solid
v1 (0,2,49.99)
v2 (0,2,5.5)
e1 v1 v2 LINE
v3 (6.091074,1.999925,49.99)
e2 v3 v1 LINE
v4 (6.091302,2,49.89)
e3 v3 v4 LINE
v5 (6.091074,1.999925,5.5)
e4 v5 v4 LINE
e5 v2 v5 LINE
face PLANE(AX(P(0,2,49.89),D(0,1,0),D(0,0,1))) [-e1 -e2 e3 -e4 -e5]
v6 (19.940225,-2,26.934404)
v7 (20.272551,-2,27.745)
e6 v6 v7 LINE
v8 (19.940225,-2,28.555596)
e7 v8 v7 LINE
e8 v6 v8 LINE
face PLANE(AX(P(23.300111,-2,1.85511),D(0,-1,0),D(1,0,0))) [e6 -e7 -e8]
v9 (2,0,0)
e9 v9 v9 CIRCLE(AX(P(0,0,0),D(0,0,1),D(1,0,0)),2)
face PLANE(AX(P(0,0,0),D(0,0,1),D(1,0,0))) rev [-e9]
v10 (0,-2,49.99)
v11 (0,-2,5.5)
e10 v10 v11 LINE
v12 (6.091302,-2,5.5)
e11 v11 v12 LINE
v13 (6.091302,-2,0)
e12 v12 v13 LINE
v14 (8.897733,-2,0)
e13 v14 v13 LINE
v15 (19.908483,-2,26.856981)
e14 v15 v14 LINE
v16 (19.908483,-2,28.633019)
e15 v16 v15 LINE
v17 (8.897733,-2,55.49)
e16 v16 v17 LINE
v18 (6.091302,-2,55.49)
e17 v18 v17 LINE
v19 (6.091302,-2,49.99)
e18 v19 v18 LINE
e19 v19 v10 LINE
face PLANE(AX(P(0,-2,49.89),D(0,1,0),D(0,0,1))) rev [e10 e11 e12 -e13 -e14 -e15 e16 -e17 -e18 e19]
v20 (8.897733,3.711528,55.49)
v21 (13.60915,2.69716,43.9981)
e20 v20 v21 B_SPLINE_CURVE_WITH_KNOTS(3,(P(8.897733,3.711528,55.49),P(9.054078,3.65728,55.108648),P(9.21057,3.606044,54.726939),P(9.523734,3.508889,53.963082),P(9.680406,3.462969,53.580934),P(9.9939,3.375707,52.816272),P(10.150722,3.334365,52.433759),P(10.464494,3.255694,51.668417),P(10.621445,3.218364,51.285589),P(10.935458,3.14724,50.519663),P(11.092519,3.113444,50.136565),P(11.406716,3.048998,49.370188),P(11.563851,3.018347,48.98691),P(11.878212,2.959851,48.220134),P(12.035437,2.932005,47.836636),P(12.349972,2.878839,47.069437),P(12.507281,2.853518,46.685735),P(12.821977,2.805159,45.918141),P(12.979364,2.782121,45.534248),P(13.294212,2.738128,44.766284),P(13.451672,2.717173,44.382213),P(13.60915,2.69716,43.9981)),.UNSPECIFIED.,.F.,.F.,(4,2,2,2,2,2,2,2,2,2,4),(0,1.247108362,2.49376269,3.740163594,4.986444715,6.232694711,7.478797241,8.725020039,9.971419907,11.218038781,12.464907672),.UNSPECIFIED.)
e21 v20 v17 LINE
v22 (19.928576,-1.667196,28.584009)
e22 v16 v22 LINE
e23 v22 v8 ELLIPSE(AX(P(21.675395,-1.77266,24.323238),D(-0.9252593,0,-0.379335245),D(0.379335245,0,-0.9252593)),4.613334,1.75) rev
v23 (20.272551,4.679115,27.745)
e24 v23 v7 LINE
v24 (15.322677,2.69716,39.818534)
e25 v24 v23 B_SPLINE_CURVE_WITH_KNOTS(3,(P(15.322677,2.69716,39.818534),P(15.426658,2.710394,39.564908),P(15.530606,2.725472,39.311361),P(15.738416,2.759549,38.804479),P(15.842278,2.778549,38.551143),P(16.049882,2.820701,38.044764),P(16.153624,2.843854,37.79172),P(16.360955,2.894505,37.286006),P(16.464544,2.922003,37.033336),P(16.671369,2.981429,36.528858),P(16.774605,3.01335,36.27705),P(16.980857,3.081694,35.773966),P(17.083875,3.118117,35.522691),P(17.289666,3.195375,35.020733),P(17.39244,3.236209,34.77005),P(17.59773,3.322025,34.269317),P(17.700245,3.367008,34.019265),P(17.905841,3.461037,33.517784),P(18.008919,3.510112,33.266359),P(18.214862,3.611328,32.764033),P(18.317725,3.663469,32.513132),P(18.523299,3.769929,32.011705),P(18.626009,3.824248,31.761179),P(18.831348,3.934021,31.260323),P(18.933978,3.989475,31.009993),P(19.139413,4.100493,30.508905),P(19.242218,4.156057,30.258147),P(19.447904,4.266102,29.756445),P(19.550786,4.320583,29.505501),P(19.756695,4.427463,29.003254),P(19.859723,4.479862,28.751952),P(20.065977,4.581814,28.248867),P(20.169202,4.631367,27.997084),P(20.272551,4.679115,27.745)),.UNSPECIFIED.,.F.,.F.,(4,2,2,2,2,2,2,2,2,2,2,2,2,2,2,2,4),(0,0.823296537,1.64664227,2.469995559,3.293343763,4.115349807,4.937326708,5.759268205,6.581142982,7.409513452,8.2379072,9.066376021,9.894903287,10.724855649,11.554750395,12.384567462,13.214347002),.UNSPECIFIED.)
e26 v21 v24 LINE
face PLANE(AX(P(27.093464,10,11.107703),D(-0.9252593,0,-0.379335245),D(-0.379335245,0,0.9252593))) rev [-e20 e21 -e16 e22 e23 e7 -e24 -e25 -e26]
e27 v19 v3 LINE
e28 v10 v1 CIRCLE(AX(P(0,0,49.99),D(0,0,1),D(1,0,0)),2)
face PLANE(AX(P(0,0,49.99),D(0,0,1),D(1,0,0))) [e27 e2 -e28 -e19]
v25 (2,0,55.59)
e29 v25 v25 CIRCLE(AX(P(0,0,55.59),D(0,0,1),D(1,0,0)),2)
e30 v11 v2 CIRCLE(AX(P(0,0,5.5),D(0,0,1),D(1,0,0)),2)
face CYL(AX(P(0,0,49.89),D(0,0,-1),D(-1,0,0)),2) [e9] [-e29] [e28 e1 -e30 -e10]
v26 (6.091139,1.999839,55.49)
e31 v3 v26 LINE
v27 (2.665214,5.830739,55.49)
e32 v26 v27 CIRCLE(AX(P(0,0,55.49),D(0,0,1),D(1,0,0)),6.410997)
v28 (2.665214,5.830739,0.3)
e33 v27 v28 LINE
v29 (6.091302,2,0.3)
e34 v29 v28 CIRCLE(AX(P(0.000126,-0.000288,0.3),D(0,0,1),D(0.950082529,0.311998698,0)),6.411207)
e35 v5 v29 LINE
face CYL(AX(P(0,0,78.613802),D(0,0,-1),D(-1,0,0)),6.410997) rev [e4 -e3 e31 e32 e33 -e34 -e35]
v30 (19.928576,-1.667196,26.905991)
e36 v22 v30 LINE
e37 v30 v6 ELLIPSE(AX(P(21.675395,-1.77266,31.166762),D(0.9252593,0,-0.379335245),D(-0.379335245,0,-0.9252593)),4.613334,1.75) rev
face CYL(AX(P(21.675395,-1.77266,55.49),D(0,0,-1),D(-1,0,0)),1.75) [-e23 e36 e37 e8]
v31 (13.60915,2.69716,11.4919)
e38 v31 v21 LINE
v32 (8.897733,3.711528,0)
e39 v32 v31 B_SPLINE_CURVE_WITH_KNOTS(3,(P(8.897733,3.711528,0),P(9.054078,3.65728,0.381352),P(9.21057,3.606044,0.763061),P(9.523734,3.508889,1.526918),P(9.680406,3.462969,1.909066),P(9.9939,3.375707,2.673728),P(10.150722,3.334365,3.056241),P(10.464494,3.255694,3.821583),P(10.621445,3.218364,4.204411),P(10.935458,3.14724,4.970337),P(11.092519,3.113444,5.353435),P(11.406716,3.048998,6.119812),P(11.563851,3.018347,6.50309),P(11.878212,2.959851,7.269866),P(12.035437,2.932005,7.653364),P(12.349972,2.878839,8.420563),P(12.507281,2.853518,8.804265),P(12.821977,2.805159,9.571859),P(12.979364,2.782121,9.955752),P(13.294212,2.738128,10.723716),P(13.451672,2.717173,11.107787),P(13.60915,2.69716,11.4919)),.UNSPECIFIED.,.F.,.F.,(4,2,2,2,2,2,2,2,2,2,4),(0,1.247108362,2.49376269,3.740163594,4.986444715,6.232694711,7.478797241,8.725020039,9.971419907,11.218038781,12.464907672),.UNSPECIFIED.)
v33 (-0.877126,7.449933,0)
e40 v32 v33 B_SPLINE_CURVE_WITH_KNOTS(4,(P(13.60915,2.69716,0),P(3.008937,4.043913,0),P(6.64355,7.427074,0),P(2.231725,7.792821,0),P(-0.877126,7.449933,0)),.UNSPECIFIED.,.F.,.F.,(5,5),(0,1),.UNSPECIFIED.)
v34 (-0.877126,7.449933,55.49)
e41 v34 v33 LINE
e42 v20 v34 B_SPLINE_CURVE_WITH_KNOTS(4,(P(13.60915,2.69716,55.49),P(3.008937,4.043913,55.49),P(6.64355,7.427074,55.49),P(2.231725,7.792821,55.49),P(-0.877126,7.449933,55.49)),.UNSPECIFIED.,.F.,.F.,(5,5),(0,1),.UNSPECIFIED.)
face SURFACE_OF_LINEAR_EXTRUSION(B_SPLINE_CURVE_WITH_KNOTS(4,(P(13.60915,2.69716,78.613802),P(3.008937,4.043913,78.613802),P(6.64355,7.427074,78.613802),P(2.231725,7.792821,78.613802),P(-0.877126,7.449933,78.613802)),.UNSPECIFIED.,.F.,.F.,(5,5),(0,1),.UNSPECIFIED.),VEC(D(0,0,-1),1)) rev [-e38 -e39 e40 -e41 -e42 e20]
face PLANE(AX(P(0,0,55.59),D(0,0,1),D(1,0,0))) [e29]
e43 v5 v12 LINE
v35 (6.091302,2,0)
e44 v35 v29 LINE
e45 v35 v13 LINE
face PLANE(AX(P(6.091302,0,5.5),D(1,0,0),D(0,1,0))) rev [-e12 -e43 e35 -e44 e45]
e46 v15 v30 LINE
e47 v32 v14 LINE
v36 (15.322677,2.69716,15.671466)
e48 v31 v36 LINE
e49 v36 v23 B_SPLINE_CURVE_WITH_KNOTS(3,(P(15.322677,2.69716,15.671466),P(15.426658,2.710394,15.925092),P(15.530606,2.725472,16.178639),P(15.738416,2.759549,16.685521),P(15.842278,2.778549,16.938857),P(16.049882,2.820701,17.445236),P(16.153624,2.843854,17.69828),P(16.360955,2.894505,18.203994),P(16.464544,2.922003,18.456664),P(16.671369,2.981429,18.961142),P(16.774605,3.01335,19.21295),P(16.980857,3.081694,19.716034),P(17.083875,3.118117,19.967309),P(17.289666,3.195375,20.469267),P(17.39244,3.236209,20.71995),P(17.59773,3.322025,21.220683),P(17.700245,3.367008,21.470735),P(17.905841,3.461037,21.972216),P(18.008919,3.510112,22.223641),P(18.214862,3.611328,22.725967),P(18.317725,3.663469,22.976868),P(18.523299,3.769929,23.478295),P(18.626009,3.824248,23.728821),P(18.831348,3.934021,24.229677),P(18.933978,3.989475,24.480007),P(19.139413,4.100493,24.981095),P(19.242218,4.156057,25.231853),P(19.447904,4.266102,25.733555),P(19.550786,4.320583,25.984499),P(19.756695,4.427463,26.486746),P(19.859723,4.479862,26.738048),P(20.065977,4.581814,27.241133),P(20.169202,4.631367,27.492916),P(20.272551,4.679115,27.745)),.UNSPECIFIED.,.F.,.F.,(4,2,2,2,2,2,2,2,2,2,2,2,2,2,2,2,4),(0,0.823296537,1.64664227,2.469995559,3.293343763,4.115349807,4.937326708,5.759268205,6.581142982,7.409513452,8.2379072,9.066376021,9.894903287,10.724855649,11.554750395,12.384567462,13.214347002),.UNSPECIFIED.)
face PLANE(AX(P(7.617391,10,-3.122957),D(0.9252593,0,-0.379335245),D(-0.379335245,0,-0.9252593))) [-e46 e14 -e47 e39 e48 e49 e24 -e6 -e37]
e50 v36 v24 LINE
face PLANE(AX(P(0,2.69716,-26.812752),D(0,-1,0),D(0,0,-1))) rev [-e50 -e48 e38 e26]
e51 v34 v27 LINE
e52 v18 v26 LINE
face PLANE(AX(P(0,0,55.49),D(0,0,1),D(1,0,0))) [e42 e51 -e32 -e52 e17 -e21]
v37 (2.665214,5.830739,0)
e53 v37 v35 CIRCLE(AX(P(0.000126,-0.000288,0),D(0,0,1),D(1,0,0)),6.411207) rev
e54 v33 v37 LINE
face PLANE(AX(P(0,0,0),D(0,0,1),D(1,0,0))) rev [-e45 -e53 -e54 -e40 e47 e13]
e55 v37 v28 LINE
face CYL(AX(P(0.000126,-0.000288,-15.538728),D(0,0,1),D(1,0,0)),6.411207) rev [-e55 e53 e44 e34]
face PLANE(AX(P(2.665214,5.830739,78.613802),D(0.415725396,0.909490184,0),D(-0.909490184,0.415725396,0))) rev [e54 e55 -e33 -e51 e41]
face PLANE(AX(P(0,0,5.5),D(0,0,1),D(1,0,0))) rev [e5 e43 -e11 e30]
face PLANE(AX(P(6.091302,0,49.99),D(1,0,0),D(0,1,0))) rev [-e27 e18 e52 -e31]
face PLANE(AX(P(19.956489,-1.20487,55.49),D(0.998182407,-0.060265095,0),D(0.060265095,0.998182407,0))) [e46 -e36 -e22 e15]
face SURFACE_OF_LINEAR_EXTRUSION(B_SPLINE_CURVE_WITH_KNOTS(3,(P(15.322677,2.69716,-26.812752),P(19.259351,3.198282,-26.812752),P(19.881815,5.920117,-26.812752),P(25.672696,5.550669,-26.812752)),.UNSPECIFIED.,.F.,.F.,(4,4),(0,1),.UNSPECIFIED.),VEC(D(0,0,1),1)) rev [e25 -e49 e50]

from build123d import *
from build123d.topology import SkipClean

# Parameters (mm, degrees)
BOSS_EXTRUDE1_DEPTH              = 55.49
BOSS_EXTRUDE5_DEPTH              = 4
BOSS_EXTRUDE6_START              = 51.49
BOSS_EXTRUDE6_DEPTH              = 4
BOSS_EXTRUDE7_START              = 5.6
BOSS_EXTRUDE7_DEPTH              = 44.29
SKETCH1_11_R                     = 2
BOSS_EXTRUDE8_DEPTH              = 55.59
BOSS_EXTRUDE9_DEPTH              = 55.49
BOSS_EXTRUDE10_REACH             = 60.551
SKETCH3_W                        = 44.29
SKETCH3_H                        = 4
BOSS_EXTRUDE11_START             = -49.89
BOSS_EXTRUDE11_DEPTH             = 55.49
CUT_EXTRUDE1_DEPTH               = 55.59
CUT_EXTRUDE1_DEPTH_BACK          = 55.59
BOSS_EXTRUDE12_DEPTH             = 49.59
BOSS_EXTRUDE12_DIRECTION_2_REACH = 60.225
BOSS_EXTRUDE13_DEPTH             = 4
BOSS_EXTRUDE14_START             = 51.49
BOSS_EXTRUDE14_DEPTH             = 4
BOSS_EXTRUDE15_DEPTH             = 0.3
CUT_EXTRUDE2_DEPTH               = 5.5
CUT_EXTRUDE3_START               = 55.49
CUT_EXTRUDE3_DEPTH               = 5.5
BOSS_EXTRUDE16_DEPTH             = 4
CUT_EXTRUDE4_DEPTH               = 5.5
CUT_EXTRUDE5_START               = -55.49
CUT_EXTRUDE5_DEPTH               = 5.5
CUT_EXTRUDE6_DEPTH               = 10
CUT_EXTRUDE6_DEPTH_BACK          = 10
CUT_EXTRUDE7_DEPTH               = 10


# Read off the part's stored shape, not the designer's step: Boss-Extrude6
with BuildPart() as part:
    # Sketch1 → Boss-Extrude1 (new body)
    with BuildSketch(Plane.XY):
        with BuildLine():
            ThreePointArc((1.129915274, -2.230087773), (-2.325656227, -0.917236673), (-0.696579505, 2.400995001))
            Line((-0.696579505, 2.400995001), (0.839733193, 4.443342601))
            Line((0.839733193, 4.443342601), (1.672696268, 5.550669345))
            Line((1.672696268, 5.550669345), (-1.620002468, 5.749465478))
            Line((-1.620002468, 5.749465478), (-3.736897473, 3.873630853))
            Line((-3.736897473, 3.873630853), (-4.07142398, -1.667196274))
            ThreePointArc((-4.07142398, -1.667196274), (-3.634366728, -2.93327365), (-2.430068683, -3.519479403))
            Line((-2.430068683, -3.519479403), (4.898910437, -3.961965286))
            Line((4.898910437, -3.961965286), (5.462782558, -3.357258899))
            Line((5.462782558, -3.357258899), (5.295730888, -2.964633462))
            Line((5.295730888, -2.964633462), (3.885857643, -2.716034769))
            Line((3.885857643, -2.716034769), (1.129915274, -2.230087773))
        make_face()
    extrude(amount=BOSS_EXTRUDE1_DEPTH)

    # Sketch1<8> → Boss-Extrude5 (add)
    with BuildSketch(Plane.XY):
        Polygon((1.672696268, 5.550669345), (0.839733193, 4.443342601), (3.885857643, -2.716034769), (5.295730888, -2.964633462), align=None)
    extrude(amount=BOSS_EXTRUDE5_DEPTH)

    # Boss-Extrude6 outline → Boss-Extrude6 (add)
    with BuildSketch(Plane.XY.offset(BOSS_EXTRUDE6_START)):
        Polygon((3.885857643, -2.71603477), (5.295730888, -2.964633462), (1.672696268, 5.550669345), (0.839733193, 4.443342601), align=None)
    extrude(amount=BOSS_EXTRUDE6_DEPTH)


with BuildPart() as body_2:
    # Sketch1<10> → Boss-Extrude7 (new body)
    with BuildSketch(Plane.XY.offset(BOSS_EXTRUDE7_START)):
        with BuildLine():
            Line((0, -2), (12, -2))
            Line((12, -2), (12, 2))
            Line((12, 2), (0, 2))
            ThreePointArc((0, 2), (-2, 0), (0, -2))
        make_face()
    extrude(amount=BOSS_EXTRUDE7_DEPTH)

    # Sketch1<11> → Boss-Extrude8 (add)
    with BuildSketch(Plane.XY):
        Circle(SKETCH1_11_R)
    extrude(amount=BOSS_EXTRUDE8_DEPTH)


with BuildPart() as body_3:
    # Sketch1<12> → Boss-Extrude9 (new body)
    with BuildSketch(Plane.XY):
        with BuildLine():
            Line((22.5, 2), (20.149982379, 2))
            Line((20.149982379, 2), (19.92857602, -1.667196274))
            ThreePointArc((19.92857602, -1.667196274), (19.926466234, -1.833875846), (19.940224749, -2))
            Line((19.940224749, -2), (22.5, -2))
            ThreePointArc((22.5, -2), (21.5, 0), (22.5, 2))
        make_face()
        with BuildLine():
            Line((20.263102527, 3.873630853), (20.149982379, 2))
            Line((20.149982379, 2), (22.5, 2))
            ThreePointArc((22.5, 2), (22.883559394, 2.236863959), (23.303420495, 2.400995001))
            Line((23.303420495, 2.400995001), (24.839733193, 4.443342601))
            Line((24.839733193, 4.443342601), (25.672696268, 5.550669345))
            Line((25.672696268, 5.550669345), (22.379997532, 5.749465478))
            Line((22.379997532, 5.749465478), (20.263102527, 3.873630853))
        make_face()
        with BuildLine():
            Line((22.5, -2), (19.940224749, -2))
            ThreePointArc((19.940224749, -2), (20.482001684, -3.052625751), (21.569931317, -3.519479403))
            Line((21.569931317, -3.519479403), (28.898910437, -3.961965286))
            Line((28.898910437, -3.961965286), (29.462782558, -3.357258899))
            Line((29.462782558, -3.357258899), (29.295730888, -2.964633462))
            Line((29.295730888, -2.964633462), (27.885857643, -2.716034769))
            Line((27.885857643, -2.716034769), (25.129915274, -2.230087773))
            ThreePointArc((25.129915274, -2.230087773), (23.782110643, -2.490486745), (22.5, -2))
        make_face()
    extrude(amount=BOSS_EXTRUDE9_DEPTH)

    # Boss-Extrude10: up to this face of the body (flat: up to its plane)
    boss_extrude10_end = Plane(body_3.part.faces().sort_by_distance((20.095839274, 1.10321729, 27.745))[0])
    # Sketch3 → Boss-Extrude10 (add, up to the picked face)
    with BuildSketch(Plane(origin=(12, 0, 0), x_dir=(0, 0, -1), z_dir=(1, 0, 0)), mode=Mode.PRIVATE) as boss_extrude10_sk1:
        with Locations((-27.745, 0)):
            Rectangle(SKETCH3_W, SKETCH3_H)
    boss_extrude10_tool1 = split(extrude(boss_extrude10_sk1.sketch, amount=BOSS_EXTRUDE10_REACH, mode=Mode.PRIVATE), bisect_by=boss_extrude10_end, keep=Keep.BOTH, mode=Mode.PRIVATE)

    add(body_2.part)  # Boss-Extrude10 merges body 2
    add(boss_extrude10_tool1.solids().sort_by(Axis((12, 0, 27.745), (1, 0, 0)))[0])

    # Sketch4 → Boss-Extrude11 (add)
    with BuildSketch(Plane.XY.offset(49.89).offset(BOSS_EXTRUDE11_START)):
        with BuildLine():
            Line((20.263102527, 3.873630853), (25.672696268, 5.550669345))
            add(Edge.make_bspline(
                [(18.253064845, 3.63105347), (20.126675338, 4.576543011), (21.657010209, 5.806862999), (25.672696268, 5.550669345)],
                knots=[0.306550142, 0.306550142, 0.306550142, 0.306550142, 1, 1, 1, 1], degree=3))
            add(Edge.make_bspline(
                [(15.322676772, 2.697160199), (16.529464831, 2.850779242), (17.424806601, 3.213085323), (18.253064845, 3.63105347)],
                knots=[0, 0, 0, 0, 0.306550142, 0.306550142, 0.306550142, 0.306550142], degree=3))
            Line((15.322676772, 2.697160199), (13.609149986, 2.697160199))
            Line((13.609149986, 2.697160199), (13.609149986, 2))
            Line((13.609149986, 2), (0, 2))
            ThreePointArc((0, 2), (2, 0), (0, -2))
            Line((0, -2), (6.092058814, -2))
            Line((6.092058814, -2), (19.908483051, -2))
            Line((19.908483051, -2), (20.263102527, 3.873630853))
        make_face()
    extrude(amount=BOSS_EXTRUDE11_DEPTH)

    # Sketch4<5> → Cut-Extrude1 (cut, two sides: drawn at the far end of the back side and taken through both)
    with BuildSketch(Plane.XY.offset(49.89).offset(-CUT_EXTRUDE1_DEPTH_BACK)):
        with BuildLine():
            add(Edge.make_bspline(
                [(18.253064845, 3.63105347), (20.126675338, 4.576543011), (21.657010209, 5.806862999), (25.672696268, 5.550669345)],
                knots=[0.306550142, 0.306550142, 0.306550142, 0.306550142, 1, 1, 1, 1], degree=3))
            Line((25.672696268, 5.550669345), (19.033452373, 9.878906939))
            Line((19.033452373, 9.878906939), (18.253064845, 3.63105347))
        make_face()
    extrude(amount=CUT_EXTRUDE1_DEPTH + CUT_EXTRUDE1_DEPTH_BACK, mode=Mode.SUBTRACT)

    # Sketch4<6> → Boss-Extrude12 (add)
    with BuildSketch(Plane.XY.offset(49.89)):
        with BuildLine():
            Line((6.092058814, 2), (13.609149986, 2))
            Line((13.609149986, 2), (13.609149986, 2.697160199))
            add(Edge.make_bspline(
                [(13.609149986, 2.697160199), (3.008937487, 4.043912628), (6.643549935, 7.427073901), (2.231724762, 7.792821065), (-0.877126137, 7.449933099)],
                knots=[0, 0, 0, 0, 0, 1, 1, 1, 1, 1], degree=4))
            Line((-0.877126137, 7.449933099), (2.665214437, 5.830739223))
            ThreePointArc((2.665214437, 5.830739223), (4.778774076, 4.27366426), (6.091049818, 2))
            Line((6.091049818, 2), (6.092058814, 2))
        make_face()
    extrude(amount=-BOSS_EXTRUDE12_DEPTH)

    # Boss-Extrude12 direction 2: up to this face of the body (flat: up to its plane)
    boss_extrude12_direction_2_end = Plane(body_3.part.faces().sort_by_distance((14.730018873, 0.349949508, 55.49))[0])
    # Sketch4<6> → Boss-Extrude12 direction 2 (add, up to the picked face)
    with BuildSketch(Plane.XY.offset(49.89), mode=Mode.PRIVATE) as boss_extrude12_direction_2_sk1:
        with BuildLine():
            Line((6.092058814, 2), (13.609149986, 2))
            Line((13.609149986, 2), (13.609149986, 2.697160199))
            add(Edge.make_bspline(
                [(13.609149986, 2.697160199), (3.008937487, 4.043912628), (6.643549935, 7.427073901), (2.231724762, 7.792821065), (-0.877126137, 7.449933099)],
                knots=[0, 0, 0, 0, 0, 1, 1, 1, 1, 1], degree=4))
            Line((-0.877126137, 7.449933099), (2.665214437, 5.830739223))
            ThreePointArc((2.665214437, 5.830739223), (4.778774076, 4.27366426), (6.091049818, 2))
            Line((6.091049818, 2), (6.092058814, 2))
        make_face()
    boss_extrude12_direction_2_tool1 = split(extrude(boss_extrude12_direction_2_sk1.sketch, amount=BOSS_EXTRUDE12_DIRECTION_2_REACH, mode=Mode.PRIVATE), bisect_by=boss_extrude12_direction_2_end, keep=Keep.BOTH, mode=Mode.PRIVATE)
    add(boss_extrude12_direction_2_tool1.solids().sort_by(Axis((6.524615, 4.223787, 49.89), (0, 0, 1)))[0])

    # Sketch1<13> → Boss-Extrude13 (add)
    with BuildSketch(Plane.XY):
        Polygon((25.672696268, 5.550669345), (24.839733193, 4.443342601), (27.885857643, -2.716034769), (29.295730888, -2.964633462), align=None)
    extrude(amount=BOSS_EXTRUDE13_DEPTH)

    # Sketch1<14> → Boss-Extrude14 (add)
    with BuildSketch(Plane.XY.offset(BOSS_EXTRUDE14_START)):
        Polygon((25.672696268, 5.550669345), (24.839733193, 4.443342601), (27.885857643, -2.716034769), (29.295730888, -2.964633462), align=None)
    extrude(amount=BOSS_EXTRUDE14_DEPTH)

    # Sketch5 → Boss-Extrude15 (add)
    with BuildSketch(Plane(origin=(0, 0, 0.3), x_dir=(-1, 0, 0), z_dir=(0, 0, -1))):
        with BuildLine():
            Line((-13.609149986, 2), (-6.091302067, 2))
            ThreePointArc((-6.091302067, 2), (-4.778900201, 4.273690642), (-2.665214437, 5.830739223))
            Line((-2.665214437, 5.830739223), (0.877126137, 7.449933099))
            add(Edge.make_bspline(
                [(0.877126137, 7.449933099), (-2.231724762, 7.792821065), (-6.643549935, 7.427073901), (-3.008937487, 4.043912628), (-13.609149986, 2.697160199)],
                knots=[0, 0, 0, 0, 0, 1, 1, 1, 1, 1], degree=4))
            Line((-13.609149986, 2.697160199), (-13.609149986, 2))
        make_face()
    extrude(amount=BOSS_EXTRUDE15_DEPTH)

    # Sketch1<15> → Cut-Extrude2 (cut)
    with SkipClean():  # the faces are left unmerged after this step: merging them gives an invalid solid
        with BuildSketch(Plane.XY):
            with BuildLine():
                Line((0, -2), (4.885305034, -2))
                Line((4.885305034, -2), (3.183411536, 2))
                Line((3.183411536, 2), (0, 2))
                ThreePointArc((0, 2), (2, 0), (0, -2))
            make_face()
        extrude(amount=CUT_EXTRUDE2_DEPTH, mode=Mode.SUBTRACT)

    # Sketch1<16> → Cut-Extrude3 (cut)
    with SkipClean():  # the faces are left unmerged after this step: merging them gives an invalid solid
        with BuildSketch(Plane.XY.offset(CUT_EXTRUDE3_START)):
            with BuildLine():
                Line((0, -2), (4.885305034, -2))
                Line((4.885305034, -2), (3.183411536, 2))
                Line((3.183411536, 2), (0, 2))
                ThreePointArc((0, 2), (2, 0), (0, -2))
            make_face()
        extrude(amount=-CUT_EXTRUDE3_DEPTH, mode=Mode.SUBTRACT)

    # Sketch1<17> → Boss-Extrude16 (add)
    with SkipClean():  # the faces are left unmerged after this step: merging them gives an invalid solid
        with BuildSketch(Plane.XY):
            with BuildLine():
                Line((24.839733193, 4.443342601), (23.303420495, 2.400995001))
                ThreePointArc((23.303420495, 2.400995001), (25.50142453, 1.998930809), (26.5, 0))
                ThreePointArc((26.5, 0), (26.499999366, -0.001781138), (26.499997462, -0.003562276))
                ThreePointArc((26.499997462, -0.003562276), (26.129183075, -1.310182978), (25.129915274, -2.230087773))
                Line((25.129915274, -2.230087773), (27.885857643, -2.716034769))
                Line((27.885857643, -2.716034769), (24.839733193, 4.443342601))
            make_face()
        extrude(amount=BOSS_EXTRUDE16_DEPTH)

    # Sketch6 → Cut-Extrude4 (cut)
    with SkipClean():  # the faces are left unmerged after this step: merging them gives an invalid solid
        with BuildSketch(Plane(origin=(0, 0, 0), x_dir=(-1, 0, 0), z_dir=(0, 0, -1))):
            Polygon((-3.183411536, 2), (-6.091302067, 2), (-6.091302067, -2), (-4.885305034, -2), align=None)
        extrude(amount=-CUT_EXTRUDE4_DEPTH, mode=Mode.SUBTRACT)

    # Sketch6<3> → Cut-Extrude5 (cut)
    with SkipClean():  # the faces are left unmerged after this step: merging them gives an invalid solid
        with BuildSketch(Plane(origin=(0, 0, 0), x_dir=(-1, 0, 0), z_dir=(0, 0, -1)).offset(CUT_EXTRUDE5_START)):
            Polygon((-3.183411536, 2), (-6.091302067, 2), (-6.091302067, -2), (-4.885305034, -2), align=None)
        extrude(amount=CUT_EXTRUDE5_DEPTH, mode=Mode.SUBTRACT)

    # Sketch8 → Cut-Extrude6 (cut, two sides: drawn at the far end of the back side and taken through both)
    with SkipClean():  # the faces are left unmerged after this step: merging them gives an invalid solid
        with BuildSketch(Plane(origin=(0, 0, 0), x_dir=(1, 0, 0), z_dir=(0, 1, 0)).offset(-CUT_EXTRUDE6_DEPTH_BACK)):
            Polygon((8.89773256, -55.49), (20.272550796, -27.745), (8.89773256, 0), (9.632888589, 3.803128997), (30.927801349, 3.803128997), (32.833315741, -63.036420075), (8.89773256, -70.58284015), align=None)
        extrude(amount=CUT_EXTRUDE6_DEPTH + CUT_EXTRUDE6_DEPTH_BACK, mode=Mode.SUBTRACT)

    # Sketch9 → Cut-Extrude7 (cut, along a direction that is not the sketch's normal)
    with SkipClean():  # the faces are left unmerged after this step: merging them gives an invalid solid
        with BuildSketch(Plane(origin=(27.093463658, 0, 11.107703171), x_dir=(0.3793352445024156, 0, -0.9252593000225896), z_dir=(0.9252593000225896, 0, 0.3793352445024156))):
            with BuildLine():
                Line((-17.981226266, -2), (-18.857301063, -2))
                add(Edge.make_bspline(
                    [(-18.857301063, -2), (-18.700912393, -2.452788244), (-17.981226266, -2.818856866)],
                    knots=[3.273172267, 3.273172267, 3.273172267, 3.782379861, 3.782379861, 3.782379861], degree=2, weights=[0.975822264, 0.955830127, 1]))
                Line((-17.981226266, -2.818856866), (-17.981226266, -2))
            make_face()
        extrude(amount=-CUT_EXTRUDE7_DEPTH, dir=(0.3793352445024153, 0, 0.9252593000225898), mode=Mode.SUBTRACT)


solid = body_3.part
